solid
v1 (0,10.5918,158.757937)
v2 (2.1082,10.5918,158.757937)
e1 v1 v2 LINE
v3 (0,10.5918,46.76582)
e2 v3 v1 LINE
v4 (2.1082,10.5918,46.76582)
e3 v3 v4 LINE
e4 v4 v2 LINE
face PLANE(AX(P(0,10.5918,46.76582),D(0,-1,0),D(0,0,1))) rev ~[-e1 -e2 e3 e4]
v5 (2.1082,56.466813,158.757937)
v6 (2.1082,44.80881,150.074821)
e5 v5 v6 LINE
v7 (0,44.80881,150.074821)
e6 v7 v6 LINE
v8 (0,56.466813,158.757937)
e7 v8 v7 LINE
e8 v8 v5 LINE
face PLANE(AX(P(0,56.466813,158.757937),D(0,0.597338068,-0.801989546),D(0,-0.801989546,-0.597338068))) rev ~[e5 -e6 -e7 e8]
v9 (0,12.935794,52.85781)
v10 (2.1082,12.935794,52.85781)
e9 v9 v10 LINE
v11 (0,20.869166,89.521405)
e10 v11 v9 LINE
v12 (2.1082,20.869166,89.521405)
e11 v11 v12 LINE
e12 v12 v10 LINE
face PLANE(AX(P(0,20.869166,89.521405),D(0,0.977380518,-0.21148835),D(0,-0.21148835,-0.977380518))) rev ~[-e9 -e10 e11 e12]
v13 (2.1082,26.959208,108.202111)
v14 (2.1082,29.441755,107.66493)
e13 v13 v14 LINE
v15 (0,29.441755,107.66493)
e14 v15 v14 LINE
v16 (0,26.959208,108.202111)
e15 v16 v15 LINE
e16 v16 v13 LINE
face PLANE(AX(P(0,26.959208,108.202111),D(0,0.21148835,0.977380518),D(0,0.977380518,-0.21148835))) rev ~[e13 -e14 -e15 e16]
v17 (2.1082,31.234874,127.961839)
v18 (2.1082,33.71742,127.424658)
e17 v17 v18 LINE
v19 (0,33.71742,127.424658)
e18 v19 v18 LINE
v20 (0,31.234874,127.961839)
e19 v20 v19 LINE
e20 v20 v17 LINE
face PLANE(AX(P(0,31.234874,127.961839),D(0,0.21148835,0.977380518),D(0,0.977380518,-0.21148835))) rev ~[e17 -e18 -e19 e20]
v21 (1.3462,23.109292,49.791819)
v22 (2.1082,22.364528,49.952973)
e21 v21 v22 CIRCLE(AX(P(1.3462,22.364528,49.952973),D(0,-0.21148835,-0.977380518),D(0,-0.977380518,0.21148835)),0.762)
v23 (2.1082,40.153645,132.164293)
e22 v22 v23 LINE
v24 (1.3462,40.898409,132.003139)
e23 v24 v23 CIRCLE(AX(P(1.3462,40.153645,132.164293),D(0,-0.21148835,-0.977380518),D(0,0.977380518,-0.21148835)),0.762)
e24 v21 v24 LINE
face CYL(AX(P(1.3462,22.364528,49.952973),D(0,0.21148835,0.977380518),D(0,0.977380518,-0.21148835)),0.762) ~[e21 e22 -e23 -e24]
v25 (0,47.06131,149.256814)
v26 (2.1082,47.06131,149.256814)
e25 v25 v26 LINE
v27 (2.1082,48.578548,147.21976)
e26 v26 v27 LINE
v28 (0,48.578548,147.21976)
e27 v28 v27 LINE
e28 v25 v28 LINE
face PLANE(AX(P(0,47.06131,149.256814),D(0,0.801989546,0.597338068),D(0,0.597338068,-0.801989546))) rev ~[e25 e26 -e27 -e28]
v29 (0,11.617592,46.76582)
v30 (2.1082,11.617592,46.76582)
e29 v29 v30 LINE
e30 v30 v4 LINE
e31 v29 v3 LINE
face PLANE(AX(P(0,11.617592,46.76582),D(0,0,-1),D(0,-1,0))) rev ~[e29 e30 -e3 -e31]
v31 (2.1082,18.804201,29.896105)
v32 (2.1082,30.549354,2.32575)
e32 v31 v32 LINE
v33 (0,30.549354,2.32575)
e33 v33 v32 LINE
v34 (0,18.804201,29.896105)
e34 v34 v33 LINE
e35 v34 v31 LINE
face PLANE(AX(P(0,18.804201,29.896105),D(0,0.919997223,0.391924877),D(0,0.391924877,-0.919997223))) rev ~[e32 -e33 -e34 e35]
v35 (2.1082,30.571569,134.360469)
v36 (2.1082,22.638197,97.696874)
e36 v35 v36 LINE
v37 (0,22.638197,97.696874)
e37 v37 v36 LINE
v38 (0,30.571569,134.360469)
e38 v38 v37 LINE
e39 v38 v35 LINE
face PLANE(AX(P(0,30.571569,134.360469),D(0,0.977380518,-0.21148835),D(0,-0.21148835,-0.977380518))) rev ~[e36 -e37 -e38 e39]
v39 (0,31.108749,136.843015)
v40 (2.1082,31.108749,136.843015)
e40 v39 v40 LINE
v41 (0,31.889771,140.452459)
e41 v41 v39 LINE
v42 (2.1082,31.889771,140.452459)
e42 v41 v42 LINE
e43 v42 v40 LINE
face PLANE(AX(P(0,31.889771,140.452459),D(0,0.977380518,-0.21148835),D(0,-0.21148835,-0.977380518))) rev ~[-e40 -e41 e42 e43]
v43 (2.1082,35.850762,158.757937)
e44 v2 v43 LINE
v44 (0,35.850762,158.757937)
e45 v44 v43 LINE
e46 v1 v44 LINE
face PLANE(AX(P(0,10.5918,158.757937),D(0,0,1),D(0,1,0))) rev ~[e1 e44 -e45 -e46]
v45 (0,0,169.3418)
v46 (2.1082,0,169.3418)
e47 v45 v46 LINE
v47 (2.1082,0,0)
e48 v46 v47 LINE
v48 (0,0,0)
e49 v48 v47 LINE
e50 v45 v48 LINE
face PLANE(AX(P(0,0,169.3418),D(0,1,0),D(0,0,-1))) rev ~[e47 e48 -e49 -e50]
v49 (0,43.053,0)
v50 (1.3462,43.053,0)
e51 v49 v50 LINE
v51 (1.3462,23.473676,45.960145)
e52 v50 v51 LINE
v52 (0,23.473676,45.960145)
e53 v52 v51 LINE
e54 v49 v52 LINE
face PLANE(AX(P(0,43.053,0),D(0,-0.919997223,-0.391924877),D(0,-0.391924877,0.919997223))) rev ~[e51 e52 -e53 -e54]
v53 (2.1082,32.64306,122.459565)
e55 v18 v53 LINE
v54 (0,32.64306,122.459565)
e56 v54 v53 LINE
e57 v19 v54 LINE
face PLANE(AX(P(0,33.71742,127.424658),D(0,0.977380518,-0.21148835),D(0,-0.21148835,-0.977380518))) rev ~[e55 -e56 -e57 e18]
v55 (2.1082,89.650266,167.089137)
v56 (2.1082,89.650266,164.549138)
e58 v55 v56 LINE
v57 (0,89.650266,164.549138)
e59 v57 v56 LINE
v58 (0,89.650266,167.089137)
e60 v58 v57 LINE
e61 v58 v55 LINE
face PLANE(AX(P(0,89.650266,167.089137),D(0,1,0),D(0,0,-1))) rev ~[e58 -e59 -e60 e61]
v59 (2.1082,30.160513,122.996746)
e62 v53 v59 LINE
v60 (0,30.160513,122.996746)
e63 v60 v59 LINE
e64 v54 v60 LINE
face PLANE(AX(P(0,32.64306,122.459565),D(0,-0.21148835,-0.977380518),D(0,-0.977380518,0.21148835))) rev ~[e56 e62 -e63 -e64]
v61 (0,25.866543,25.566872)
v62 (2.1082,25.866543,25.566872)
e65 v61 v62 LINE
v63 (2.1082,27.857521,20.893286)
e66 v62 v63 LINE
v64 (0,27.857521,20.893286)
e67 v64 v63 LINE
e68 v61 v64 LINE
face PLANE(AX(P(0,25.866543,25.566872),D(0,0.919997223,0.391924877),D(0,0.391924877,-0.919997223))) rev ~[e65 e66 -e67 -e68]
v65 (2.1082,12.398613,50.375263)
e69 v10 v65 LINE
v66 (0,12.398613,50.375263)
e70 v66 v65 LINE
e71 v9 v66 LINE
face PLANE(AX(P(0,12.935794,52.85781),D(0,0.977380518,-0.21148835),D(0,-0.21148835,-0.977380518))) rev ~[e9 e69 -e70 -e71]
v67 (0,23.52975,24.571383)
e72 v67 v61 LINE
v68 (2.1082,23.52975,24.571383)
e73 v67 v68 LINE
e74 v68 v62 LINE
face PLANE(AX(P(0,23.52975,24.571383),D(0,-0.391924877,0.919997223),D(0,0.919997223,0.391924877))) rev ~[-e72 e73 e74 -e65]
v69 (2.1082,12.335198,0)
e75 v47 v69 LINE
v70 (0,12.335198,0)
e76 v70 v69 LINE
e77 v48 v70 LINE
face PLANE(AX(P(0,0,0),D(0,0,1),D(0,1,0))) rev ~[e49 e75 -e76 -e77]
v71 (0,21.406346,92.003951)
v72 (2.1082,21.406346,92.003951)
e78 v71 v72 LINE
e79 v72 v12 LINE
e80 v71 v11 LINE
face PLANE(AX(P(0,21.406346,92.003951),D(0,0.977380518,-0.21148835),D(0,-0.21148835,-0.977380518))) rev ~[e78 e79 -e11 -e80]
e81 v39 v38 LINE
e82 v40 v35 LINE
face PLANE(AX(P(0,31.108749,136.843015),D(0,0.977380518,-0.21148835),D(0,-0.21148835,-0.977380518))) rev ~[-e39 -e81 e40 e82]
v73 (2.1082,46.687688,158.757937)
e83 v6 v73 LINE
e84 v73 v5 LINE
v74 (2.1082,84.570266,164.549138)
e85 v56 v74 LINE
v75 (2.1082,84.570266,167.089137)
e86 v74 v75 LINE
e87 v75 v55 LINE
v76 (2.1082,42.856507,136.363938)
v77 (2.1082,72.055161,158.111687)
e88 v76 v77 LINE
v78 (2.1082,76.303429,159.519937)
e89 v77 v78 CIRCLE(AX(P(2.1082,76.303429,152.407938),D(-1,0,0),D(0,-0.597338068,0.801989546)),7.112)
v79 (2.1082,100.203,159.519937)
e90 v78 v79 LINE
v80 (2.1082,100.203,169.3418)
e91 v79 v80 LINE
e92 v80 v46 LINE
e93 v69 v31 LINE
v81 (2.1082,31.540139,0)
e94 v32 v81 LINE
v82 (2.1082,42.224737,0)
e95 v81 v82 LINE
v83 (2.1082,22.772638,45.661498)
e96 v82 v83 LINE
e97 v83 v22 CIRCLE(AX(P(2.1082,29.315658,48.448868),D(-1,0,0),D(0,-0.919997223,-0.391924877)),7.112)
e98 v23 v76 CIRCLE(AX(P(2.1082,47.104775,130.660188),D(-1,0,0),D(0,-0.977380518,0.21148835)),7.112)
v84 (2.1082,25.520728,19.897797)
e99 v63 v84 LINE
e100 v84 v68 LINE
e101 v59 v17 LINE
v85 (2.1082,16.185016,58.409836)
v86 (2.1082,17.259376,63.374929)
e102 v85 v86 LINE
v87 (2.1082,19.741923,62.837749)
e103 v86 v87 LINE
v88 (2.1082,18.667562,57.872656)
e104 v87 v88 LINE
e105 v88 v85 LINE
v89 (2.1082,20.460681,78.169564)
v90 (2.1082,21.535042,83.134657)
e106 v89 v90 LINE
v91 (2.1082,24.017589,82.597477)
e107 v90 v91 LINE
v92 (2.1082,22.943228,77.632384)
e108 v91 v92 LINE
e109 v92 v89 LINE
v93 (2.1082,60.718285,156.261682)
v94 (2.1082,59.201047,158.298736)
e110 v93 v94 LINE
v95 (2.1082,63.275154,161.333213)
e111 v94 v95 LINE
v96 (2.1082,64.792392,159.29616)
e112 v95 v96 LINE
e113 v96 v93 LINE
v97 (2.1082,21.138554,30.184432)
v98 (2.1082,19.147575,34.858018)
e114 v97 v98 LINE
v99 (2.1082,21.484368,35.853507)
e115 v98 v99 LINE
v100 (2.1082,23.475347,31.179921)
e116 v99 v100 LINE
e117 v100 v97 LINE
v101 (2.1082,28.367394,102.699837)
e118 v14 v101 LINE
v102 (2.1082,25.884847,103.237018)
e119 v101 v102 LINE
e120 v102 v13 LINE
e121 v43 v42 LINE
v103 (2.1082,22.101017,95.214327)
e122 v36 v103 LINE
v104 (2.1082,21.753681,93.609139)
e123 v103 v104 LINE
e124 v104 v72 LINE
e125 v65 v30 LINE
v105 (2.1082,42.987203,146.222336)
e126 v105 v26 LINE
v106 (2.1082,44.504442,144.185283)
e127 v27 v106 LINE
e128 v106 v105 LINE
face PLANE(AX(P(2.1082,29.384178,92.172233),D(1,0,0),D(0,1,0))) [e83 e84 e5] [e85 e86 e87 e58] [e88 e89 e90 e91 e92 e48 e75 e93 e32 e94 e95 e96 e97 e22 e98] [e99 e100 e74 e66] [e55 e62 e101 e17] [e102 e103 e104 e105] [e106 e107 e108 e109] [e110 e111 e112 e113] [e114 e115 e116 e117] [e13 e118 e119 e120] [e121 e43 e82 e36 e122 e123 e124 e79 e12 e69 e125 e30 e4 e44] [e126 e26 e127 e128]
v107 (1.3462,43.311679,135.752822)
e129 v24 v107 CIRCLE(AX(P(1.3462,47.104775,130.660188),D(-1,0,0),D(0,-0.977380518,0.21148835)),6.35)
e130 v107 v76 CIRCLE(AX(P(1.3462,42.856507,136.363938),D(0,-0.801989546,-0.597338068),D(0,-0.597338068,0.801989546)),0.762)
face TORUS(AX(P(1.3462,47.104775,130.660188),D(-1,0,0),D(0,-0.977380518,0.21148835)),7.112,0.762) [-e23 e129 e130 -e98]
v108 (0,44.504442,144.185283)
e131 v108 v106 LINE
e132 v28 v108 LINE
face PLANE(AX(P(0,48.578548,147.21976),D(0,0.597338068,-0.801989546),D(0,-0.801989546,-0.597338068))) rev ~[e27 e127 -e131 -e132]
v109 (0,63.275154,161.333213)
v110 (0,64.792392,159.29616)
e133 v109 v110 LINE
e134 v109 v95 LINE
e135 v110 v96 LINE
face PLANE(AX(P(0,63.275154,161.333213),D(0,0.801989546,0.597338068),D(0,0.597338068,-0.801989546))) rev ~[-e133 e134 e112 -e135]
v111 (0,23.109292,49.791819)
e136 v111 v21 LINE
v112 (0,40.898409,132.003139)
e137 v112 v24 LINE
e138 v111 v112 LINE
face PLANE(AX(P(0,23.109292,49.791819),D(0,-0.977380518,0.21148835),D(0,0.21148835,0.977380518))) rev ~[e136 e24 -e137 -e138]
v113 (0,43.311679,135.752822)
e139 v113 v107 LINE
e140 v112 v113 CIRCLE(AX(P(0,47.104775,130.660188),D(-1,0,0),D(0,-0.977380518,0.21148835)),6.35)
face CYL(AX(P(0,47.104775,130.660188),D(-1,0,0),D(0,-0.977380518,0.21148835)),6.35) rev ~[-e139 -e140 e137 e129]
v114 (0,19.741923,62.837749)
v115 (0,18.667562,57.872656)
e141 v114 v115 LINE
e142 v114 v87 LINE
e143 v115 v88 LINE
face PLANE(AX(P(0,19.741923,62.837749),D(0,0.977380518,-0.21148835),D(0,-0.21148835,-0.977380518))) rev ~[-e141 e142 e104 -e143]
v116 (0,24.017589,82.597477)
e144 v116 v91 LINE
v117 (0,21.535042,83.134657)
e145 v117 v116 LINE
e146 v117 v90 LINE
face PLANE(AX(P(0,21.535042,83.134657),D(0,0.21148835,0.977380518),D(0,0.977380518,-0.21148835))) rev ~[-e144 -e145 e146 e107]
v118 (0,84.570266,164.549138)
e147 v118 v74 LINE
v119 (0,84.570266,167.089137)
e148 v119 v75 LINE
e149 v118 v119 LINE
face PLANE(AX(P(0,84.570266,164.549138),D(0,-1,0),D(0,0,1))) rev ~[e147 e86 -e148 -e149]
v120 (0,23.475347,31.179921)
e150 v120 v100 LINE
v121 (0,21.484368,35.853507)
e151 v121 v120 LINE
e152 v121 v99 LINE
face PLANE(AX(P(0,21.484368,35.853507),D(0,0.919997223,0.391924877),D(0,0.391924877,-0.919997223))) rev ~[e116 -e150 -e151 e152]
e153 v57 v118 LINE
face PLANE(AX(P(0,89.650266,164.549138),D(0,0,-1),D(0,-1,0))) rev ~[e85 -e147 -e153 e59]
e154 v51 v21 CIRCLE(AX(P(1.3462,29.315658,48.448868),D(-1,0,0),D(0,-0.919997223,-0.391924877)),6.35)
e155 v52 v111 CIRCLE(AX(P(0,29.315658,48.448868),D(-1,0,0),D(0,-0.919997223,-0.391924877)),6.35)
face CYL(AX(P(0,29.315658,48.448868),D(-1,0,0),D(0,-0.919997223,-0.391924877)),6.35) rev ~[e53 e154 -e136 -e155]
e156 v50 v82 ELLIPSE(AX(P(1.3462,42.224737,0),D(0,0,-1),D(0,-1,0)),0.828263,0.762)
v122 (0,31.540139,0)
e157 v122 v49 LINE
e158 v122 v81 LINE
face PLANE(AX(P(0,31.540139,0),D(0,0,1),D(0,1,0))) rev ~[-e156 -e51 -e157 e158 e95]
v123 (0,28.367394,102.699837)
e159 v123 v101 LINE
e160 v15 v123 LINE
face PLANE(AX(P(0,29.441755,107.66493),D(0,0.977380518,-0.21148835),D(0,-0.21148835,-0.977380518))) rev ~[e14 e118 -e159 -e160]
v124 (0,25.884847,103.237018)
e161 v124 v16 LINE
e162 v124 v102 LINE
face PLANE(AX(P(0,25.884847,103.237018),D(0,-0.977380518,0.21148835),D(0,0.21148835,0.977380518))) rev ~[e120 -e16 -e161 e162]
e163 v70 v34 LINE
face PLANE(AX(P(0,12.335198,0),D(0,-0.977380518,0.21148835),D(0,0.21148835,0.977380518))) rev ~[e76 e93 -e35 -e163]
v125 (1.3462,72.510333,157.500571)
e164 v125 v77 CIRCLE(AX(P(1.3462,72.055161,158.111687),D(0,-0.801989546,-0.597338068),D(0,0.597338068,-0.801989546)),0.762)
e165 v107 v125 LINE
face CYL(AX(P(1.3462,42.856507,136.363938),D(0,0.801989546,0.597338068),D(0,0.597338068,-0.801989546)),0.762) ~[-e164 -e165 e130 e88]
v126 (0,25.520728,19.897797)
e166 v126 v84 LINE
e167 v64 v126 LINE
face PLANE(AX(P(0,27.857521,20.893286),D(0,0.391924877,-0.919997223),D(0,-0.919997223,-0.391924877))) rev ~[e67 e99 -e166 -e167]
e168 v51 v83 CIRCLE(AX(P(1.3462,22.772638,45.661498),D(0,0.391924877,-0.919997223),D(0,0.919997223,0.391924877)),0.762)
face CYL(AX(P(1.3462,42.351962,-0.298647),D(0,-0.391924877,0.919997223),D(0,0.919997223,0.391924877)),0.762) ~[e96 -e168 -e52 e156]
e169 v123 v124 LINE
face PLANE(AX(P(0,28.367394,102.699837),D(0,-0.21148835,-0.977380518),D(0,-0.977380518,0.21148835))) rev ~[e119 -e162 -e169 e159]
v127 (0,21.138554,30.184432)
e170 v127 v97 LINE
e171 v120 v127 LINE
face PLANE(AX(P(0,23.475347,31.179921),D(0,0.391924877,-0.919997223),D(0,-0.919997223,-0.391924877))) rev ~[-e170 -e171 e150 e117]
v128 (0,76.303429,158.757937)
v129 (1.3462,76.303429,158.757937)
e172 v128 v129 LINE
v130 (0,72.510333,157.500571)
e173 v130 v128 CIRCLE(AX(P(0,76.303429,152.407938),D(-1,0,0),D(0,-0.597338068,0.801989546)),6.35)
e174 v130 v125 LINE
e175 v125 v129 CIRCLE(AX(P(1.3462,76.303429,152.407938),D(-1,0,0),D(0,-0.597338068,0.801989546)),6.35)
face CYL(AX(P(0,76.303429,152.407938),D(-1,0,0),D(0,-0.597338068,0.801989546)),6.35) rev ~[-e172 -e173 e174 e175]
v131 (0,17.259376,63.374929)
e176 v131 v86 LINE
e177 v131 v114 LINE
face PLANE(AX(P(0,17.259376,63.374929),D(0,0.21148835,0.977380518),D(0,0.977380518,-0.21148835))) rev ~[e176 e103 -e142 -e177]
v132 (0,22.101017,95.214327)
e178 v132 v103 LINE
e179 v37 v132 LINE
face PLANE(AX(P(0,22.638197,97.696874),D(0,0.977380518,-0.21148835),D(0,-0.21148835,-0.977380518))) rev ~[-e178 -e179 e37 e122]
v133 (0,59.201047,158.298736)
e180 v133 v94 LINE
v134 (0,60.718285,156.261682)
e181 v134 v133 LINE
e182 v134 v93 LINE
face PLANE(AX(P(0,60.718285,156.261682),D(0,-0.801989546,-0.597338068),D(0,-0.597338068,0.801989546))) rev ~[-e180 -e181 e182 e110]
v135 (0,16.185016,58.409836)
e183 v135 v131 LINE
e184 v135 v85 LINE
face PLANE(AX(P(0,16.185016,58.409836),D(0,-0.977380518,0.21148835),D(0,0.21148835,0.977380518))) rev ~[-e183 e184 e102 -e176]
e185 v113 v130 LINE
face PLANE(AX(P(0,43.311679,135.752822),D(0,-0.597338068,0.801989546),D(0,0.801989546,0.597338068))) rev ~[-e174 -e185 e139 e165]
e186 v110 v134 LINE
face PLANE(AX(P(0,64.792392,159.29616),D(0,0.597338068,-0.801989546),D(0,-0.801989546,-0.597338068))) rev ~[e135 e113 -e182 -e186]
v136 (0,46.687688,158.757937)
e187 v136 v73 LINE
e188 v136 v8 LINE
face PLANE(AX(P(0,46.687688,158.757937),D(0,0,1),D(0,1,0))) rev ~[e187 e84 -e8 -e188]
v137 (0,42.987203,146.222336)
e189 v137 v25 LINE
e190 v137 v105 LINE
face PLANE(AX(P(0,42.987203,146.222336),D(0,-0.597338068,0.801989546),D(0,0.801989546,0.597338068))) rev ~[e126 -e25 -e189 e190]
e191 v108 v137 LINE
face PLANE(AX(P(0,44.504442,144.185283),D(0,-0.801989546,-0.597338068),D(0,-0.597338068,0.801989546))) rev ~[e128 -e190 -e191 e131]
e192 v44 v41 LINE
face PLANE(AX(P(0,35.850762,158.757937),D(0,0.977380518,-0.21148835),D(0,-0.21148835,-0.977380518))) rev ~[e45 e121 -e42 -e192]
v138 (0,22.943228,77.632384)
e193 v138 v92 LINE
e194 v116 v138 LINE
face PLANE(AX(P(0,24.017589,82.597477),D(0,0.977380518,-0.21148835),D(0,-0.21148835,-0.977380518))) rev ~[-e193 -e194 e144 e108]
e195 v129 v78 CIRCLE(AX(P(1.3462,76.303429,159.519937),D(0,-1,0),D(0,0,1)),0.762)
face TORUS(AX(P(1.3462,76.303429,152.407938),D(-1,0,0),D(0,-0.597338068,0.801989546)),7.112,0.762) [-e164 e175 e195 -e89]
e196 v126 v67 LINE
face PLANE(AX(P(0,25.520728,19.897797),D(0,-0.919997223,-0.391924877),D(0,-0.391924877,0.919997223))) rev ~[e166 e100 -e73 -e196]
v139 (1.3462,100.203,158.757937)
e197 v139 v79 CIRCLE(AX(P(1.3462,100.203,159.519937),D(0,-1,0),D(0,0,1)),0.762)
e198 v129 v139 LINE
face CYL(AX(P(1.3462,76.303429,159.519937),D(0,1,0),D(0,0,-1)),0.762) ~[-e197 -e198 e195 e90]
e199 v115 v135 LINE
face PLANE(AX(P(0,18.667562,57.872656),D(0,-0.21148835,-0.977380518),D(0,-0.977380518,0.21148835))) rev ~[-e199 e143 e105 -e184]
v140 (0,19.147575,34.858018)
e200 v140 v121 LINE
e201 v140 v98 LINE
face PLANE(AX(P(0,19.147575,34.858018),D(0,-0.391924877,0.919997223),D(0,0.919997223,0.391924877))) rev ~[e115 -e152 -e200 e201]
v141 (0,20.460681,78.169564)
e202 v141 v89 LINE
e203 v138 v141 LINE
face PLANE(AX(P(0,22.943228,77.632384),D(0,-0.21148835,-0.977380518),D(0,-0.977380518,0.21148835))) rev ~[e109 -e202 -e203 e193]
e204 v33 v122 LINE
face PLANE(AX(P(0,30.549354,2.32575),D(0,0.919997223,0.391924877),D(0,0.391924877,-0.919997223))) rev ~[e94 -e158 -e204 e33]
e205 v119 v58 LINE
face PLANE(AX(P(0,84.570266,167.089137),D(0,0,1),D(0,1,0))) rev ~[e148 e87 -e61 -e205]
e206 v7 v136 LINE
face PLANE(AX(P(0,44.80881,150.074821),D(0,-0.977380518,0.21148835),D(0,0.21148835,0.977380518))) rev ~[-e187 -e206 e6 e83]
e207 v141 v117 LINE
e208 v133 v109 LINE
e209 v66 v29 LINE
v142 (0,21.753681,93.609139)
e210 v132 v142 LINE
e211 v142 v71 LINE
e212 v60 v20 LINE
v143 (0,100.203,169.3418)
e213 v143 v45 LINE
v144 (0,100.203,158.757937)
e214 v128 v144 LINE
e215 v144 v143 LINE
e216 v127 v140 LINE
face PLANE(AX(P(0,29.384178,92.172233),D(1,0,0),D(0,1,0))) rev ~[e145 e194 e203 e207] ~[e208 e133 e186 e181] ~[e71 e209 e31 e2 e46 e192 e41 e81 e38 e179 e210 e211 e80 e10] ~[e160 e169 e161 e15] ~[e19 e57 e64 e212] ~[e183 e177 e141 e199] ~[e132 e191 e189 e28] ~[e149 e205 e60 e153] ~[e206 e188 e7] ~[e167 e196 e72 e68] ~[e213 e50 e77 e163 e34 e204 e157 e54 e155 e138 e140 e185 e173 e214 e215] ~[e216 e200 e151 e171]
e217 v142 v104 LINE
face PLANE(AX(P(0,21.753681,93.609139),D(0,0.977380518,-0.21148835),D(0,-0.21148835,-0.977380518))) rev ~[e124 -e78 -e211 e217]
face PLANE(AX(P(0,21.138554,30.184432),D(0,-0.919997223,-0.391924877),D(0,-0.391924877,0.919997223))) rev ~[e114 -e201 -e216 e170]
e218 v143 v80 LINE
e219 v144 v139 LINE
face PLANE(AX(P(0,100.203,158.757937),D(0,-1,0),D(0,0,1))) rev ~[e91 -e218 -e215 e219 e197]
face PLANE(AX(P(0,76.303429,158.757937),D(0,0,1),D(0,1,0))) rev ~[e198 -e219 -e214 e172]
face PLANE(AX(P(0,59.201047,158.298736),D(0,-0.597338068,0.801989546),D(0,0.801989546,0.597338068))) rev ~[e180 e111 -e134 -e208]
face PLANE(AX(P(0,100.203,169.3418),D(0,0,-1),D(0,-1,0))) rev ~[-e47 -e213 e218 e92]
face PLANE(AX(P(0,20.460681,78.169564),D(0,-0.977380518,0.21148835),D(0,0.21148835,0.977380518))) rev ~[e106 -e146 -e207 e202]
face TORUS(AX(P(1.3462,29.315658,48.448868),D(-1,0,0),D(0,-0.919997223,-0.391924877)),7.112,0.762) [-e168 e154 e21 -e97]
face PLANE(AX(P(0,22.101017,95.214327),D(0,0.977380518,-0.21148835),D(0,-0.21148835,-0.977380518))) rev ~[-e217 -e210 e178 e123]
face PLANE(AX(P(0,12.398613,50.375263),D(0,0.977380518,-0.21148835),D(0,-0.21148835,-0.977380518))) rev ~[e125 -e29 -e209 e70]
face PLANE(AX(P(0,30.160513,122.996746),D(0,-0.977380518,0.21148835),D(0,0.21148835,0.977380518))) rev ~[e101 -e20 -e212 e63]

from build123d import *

# Parameters (mm, degrees)
F0_W     = 5.08
F0_H     = 2.54
F1_DEPTH = 2.1082
F2_R     = 0.762


with BuildPart() as f1:
    # F0 (on Right) → F1 (new body)
    with BuildSketch(Plane.YZ):
        with BuildLine():
            Line((0, 162.0091375), (0, 0))
            Line((0, 0), (12.335197777, 0))
            Line((12.335197777, 0), (18.8042013144, 29.896105485))
            Line((18.8042013144, 29.896105485), (30.5493542935, 2.3257501254))
            Line((30.5493542935, 2.3257501254), (31.5401391658, 0))
            Line((31.5401391658, 0), (31.5707651968, 0))
            Line((31.5707651968, 0), (40.8442968098, 0))
            Line((40.8442968098, 0), (20.5594925834, 47.616175108))
            Line((20.5594925834, 47.616175108), (39.5771112022, 135.5049402038))
            Line((39.5771112022, 135.5049402038), (73.5248959406, 160.7899383022))
            Line((73.5248959406, 160.7899383022), (100.203, 160.7899383022))
            Line((100.203, 160.7899383022), (100.203, 162.0091375))
            Line((100.203, 162.0091375), (82.1398573303, 162.0091375))
            ThreePointArc((82.1398573303, 162.0091375), (80.3438061061, 162.7530862758), (79.5998573303, 164.5491375))
            Line((79.5998573303, 164.5491375), (79.5998573303, 169.3418))
            Line((79.5998573303, 169.3418), (70.6874244764, 169.3418))
            Line((70.6874244764, 169.3418), (70.6874244764, 165.8480664454))
            Line((70.6874244764, 165.8480664454), (70.6874244764, 164.5491375))
            ThreePointArc((70.6874244764, 164.5491375), (70.0510915867, 162.8675752701), (68.4609272063, 162.0285589874))
            ThreePointArc((68.4609272063, 162.0285589874), (68.3044763435, 162.0139975214), (68.1474244764, 162.0091375))
            Line((68.1474244764, 162.0091375), (0, 162.0091375))
        make_face()
        Polygon((21.4843682503, 35.8535070154), (23.4753466245, 31.1799211209), (21.1385536773, 30.1844319338), (19.147575303, 34.8580178283), align=None, mode=Mode.SUBTRACT)
        Polygon((25.8665425285, 25.5668719827), (27.8575209028, 20.8932860882), (25.5207279555, 19.8977969011), (23.5297495813, 24.5713827956), align=None, mode=Mode.SUBTRACT)
        with BuildLine():
            Line((12.3986134924, 50.3752630702), (11.6175919588, 46.7658196656))
            Line((11.6175919588, 46.7658196656), (10.5918, 46.7658196656))
            Line((10.5918, 46.7658196656), (10.5918, 158.7579375))
            Line((10.5918, 158.7579375), (35.8507619547, 158.7579375))
            Line((35.8507619547, 158.7579375), (31.8897708968, 140.4524587956))
            Line((31.8897708968, 140.4524587956), (31.1087493632, 136.8430153909))
            Line((31.1087493632, 136.8430153909), (35.5475592049, 135.882533211))
            ThreePointArc((35.5475592049, 135.882533211), (37.1456481821, 134.7755682604), (37.4929253116, 132.8628062845))
            Line((37.4929253116, 132.8628062845), (29.5595533377, 96.1992113407))
            ThreePointArc((29.5595533377, 96.1992113407), (28.452588387, 94.6011223635), (26.5398264112, 94.2538452339))
            Line((26.5398264112, 94.2538452339), (22.1010165695, 95.2143274138))
            Line((22.1010165695, 95.2143274138), (21.7536814278, 93.6091392306))
            Line((21.7536814278, 93.6091392306), (21.4063462861, 92.0039510473))
            Line((21.4063462861, 92.0039510473), (25.8451561277, 91.0434688674))
            ThreePointArc((25.8451561277, 91.0434688674), (27.4432451049, 89.9365039168), (27.7905222345, 88.0237419409))
            Line((27.7905222345, 88.0237419409), (19.8571502605, 51.3601469971))
            ThreePointArc((19.8571502605, 51.3601469971), (18.7501853099, 49.7620580199), (16.837423334, 49.4147808903))
            Line((16.837423334, 49.4147808903), (12.3986134924, 50.3752630702))
        make_face(mode=Mode.SUBTRACT)
        Polygon((47.0613097153, 149.2568137468), (48.5785484084, 147.2197602993), (44.5044415132, 144.1852829132), (42.9872028202, 146.2223363607), align=None, mode=Mode.SUBTRACT)
        Polygon((44.8088104432, 150.074821282), (46.6876875952, 158.7579375), (56.4668125154, 158.7579375), align=None, mode=Mode.SUBTRACT)
        Polygon((63.2751536106, 161.3332132886), (64.7923923036, 159.296159841), (60.7182854085, 156.2616824549), (59.2010467154, 158.2987359025), align=None, mode=Mode.SUBTRACT)
        with BuildLine():
            Line((0, 164.5491375), (0, 162.0091375))
            Line((0, 162.0091375), (68.1474244764, 162.0091375))
            ThreePointArc((68.1474244764, 162.0091375), (68.3044763435, 162.0139975214), (68.4609272063, 162.0285589874))
            Line((68.4609272063, 162.0285589874), (69.6856973646, 162.9407926238))
            Line((69.6856973646, 162.9407926238), (68.1474244764, 165.0060867035))
            Line((68.1474244764, 165.0060867035), (68.1474244764, 164.5491375))
            Line((68.1474244764, 164.5491375), (55.1748093832, 164.5491375))
            Line((55.1748093832, 164.5491375), (50.0948093832, 164.5491375))
            Line((50.0948093832, 164.5491375), (10.3999171089, 164.5491375))
            Line((10.3999171089, 164.5491375), (5.3199171089, 164.5491375))
            Line((5.3199171089, 164.5491375), (0, 164.5491375))
        make_face()
        Polygon((0, 169.3418), (0, 164.5491375), (5.3199171089, 164.5491375), (5.3199171089, 167.0891375), (10.3999171089, 167.0891375), (10.3999171089, 164.5491375), (50.0948093832, 164.5491375), (50.0948093832, 167.0891375), (55.1748093832, 167.0891375), (55.1748093832, 164.5491375), (68.1474244764, 164.5491375), (68.1474244764, 165.0060867035), (68.1474244764, 169.3418), align=None)
        with Locations((7.8599171089, 165.8191375)):
            Rectangle(F0_W, F0_H)
        with BuildLine():
            Line((69.6856973646, 162.9407926238), (68.4609272063, 162.0285589874))
            ThreePointArc((68.4609272063, 162.0285589874), (70.0510915867, 162.8675752701), (70.6874244764, 164.5491375))
            Line((70.6874244764, 164.5491375), (70.6874244764, 165.8480664454))
            Line((70.6874244764, 165.8480664454), (70.6874244764, 169.3418))
            Line((70.6874244764, 169.3418), (68.1474244764, 169.3418))
            Line((68.1474244764, 169.3418), (68.1474244764, 165.0060867035))
            Line((68.1474244764, 165.0060867035), (69.6856973646, 162.9407926238))
        make_face()
        with Locations((52.6348093832, 165.8191375)):
            Rectangle(F0_W, F0_H)
        with BuildLine():
            Line((20.5594925834, 47.616175108), (40.8442968098, 0))
            Line((40.8442968098, 0), (43.053, 0))
            Line((43.053, 0), (23.4736756901, 45.9601445708))
            ThreePointArc((23.4736756901, 45.9601445708), (22.9941781878, 47.847708452), (23.1092917667, 49.7918185633))
            Line((23.1092917667, 49.7918185633), (40.8984089502, 132.0031391675))
            ThreePointArc((40.8984089502, 132.0031391675), (41.765080018, 134.0967787378), (43.3116785091, 135.7528217618))
            Line((43.3116785091, 135.7528217618), (72.5103326221, 157.500571119))
            ThreePointArc((72.5103326221, 157.500571119), (74.3053957564, 158.4354047741), (76.3034293547, 158.7579375))
            Line((76.3034293547, 158.7579375), (100.203, 158.7579375))
            Line((100.203, 158.7579375), (100.203, 160.7899383022))
            Line((100.203, 160.7899383022), (73.5248959406, 160.7899383022))
            Line((73.5248959406, 160.7899383022), (39.5771112022, 135.5049402038))
            Line((39.5771112022, 135.5049402038), (20.5594925834, 47.616175108))
        make_face()
        with BuildLine():
            Line((82.1398573303, 169.3418), (79.5998573303, 169.3418))
            Line((79.5998573303, 169.3418), (79.5998573303, 164.5491375))
            ThreePointArc((79.5998573303, 164.5491375), (80.3438061061, 162.7530862758), (82.1398573303, 162.0091375))
            Line((82.1398573303, 162.0091375), (100.203, 162.0091375))
            Line((100.203, 162.0091375), (100.203, 164.5491375))
            Line((100.203, 164.5491375), (89.6502663064, 164.5491375))
            Line((89.6502663064, 164.5491375), (84.5702663064, 164.5491375))
            Line((84.5702663064, 164.5491375), (82.1398573303, 164.5491375))
            Line((82.1398573303, 164.5491375), (82.1398573303, 169.3418))
        make_face()
        Polygon((100.203, 169.3418), (82.1398573303, 169.3418), (82.1398573303, 164.5491375), (84.5702663064, 164.5491375), (84.5702663064, 167.0891375), (89.6502663064, 167.0891375), (89.6502663064, 164.5491375), (100.203, 164.5491375), align=None)
        with BuildLine():
            Line((12.9357939022, 52.8578095868), (12.3986134924, 50.3752630702))
            Line((12.3986134924, 50.3752630702), (16.837423334, 49.4147808903))
            ThreePointArc((16.837423334, 49.4147808903), (18.7501853099, 49.7620580199), (19.8571502605, 51.3601469971))
            Line((19.8571502605, 51.3601469971), (27.7905222345, 88.0237419409))
            ThreePointArc((27.7905222345, 88.0237419409), (27.4432451049, 89.9365039168), (25.8451561277, 91.0434688674))
            Line((25.8451561277, 91.0434688674), (21.4063462861, 92.0039510473))
            Line((21.4063462861, 92.0039510473), (20.8691658762, 89.5214045307))
            Line((20.8691658762, 89.5214045307), (25.3079757178, 88.5609223508))
            Line((25.3079757178, 88.5609223508), (24.0175885553, 82.5974767434))
            Line((24.0175885553, 82.5974767434), (22.9432277355, 77.6323837102))
            Line((22.9432277355, 77.6323837102), (19.7419229759, 62.8377489213))
            Line((19.7419229759, 62.8377489213), (18.6675621562, 57.872655888))
            Line((18.6675621562, 57.872655888), (17.3746037439, 51.8973274069))
            Line((17.3746037439, 51.8973274069), (12.9357939022, 52.8578095868))
        make_face()
        Polygon((20.8691658762, 89.5214045307), (12.9357939022, 52.8578095868), (17.3746037439, 51.8973274069), (18.6675621562, 57.872655888), (16.1850156395, 58.4098362979), (17.2593764593, 63.3749293312), (19.7419229759, 62.8377489213), (22.9432277355, 77.6323837102), (20.4606812189, 78.16956412), (21.5350420386, 83.1346571533), (24.0175885553, 82.5974767434), (25.3079757178, 88.5609223508), align=None)
        with BuildLine():
            Line((35.5475592049, 135.882533211), (31.1087493632, 136.8430153909))
            Line((31.1087493632, 136.8430153909), (30.5715689534, 134.3604688743))
            Line((30.5715689534, 134.3604688743), (35.010378795, 133.3999866944))
            Line((35.010378795, 133.3999866944), (33.7174203827, 127.4246582133))
            Line((33.7174203827, 127.4246582133), (32.643059563, 122.45956518))
            Line((32.643059563, 122.45956518), (29.4417548033, 107.6649303911))
            Line((29.4417548033, 107.6649303911), (28.3673939836, 102.6998373579))
            Line((28.3673939836, 102.6998373579), (27.077006821, 96.7363917505))
            Line((27.077006821, 96.7363917505), (22.6381969794, 97.6968739305))
            Line((22.6381969794, 97.6968739305), (22.1010165695, 95.2143274138))
            Line((22.1010165695, 95.2143274138), (26.5398264112, 94.2538452339))
            ThreePointArc((26.5398264112, 94.2538452339), (28.452588387, 94.6011223635), (29.5595533377, 96.1992113407))
            Line((29.5595533377, 96.1992113407), (37.4929253116, 132.8628062845))
            ThreePointArc((37.4929253116, 132.8628062845), (37.1456481821, 134.7755682604), (35.5475592049, 135.882533211))
        make_face()
        Polygon((35.010378795, 133.3999866944), (30.5715689534, 134.3604688743), (22.6381969794, 97.6968739305), (27.077006821, 96.7363917505), (28.3673939836, 102.6998373579), (25.884847467, 103.2370177677), (26.9592082867, 108.202110801), (29.4417548033, 107.6649303911), (32.643059563, 122.45956518), (30.1605130463, 122.9967455899), (31.2348738661, 127.9618386231), (33.7174203827, 127.4246582133), align=None)
    extrude(amount=F1_DEPTH)

    # F2
    f2_edges = [f1.edges().sort_by_distance(p)[0] for p in [
        (2.1082, 32.00385, 90.897479),
        (2.1082, 33.263338, 22.980072),
        (2.1082, 22.994178, 47.847708),
        (2.1082, 41.76508, 134.096779),
        (2.1082, 57.911006, 146.626696),
        (2.1082, 74.305396, 158.435405),
        (2.1082, 88.253215, 158.757937),
    ]]
    fillet(f2_edges, radius=F2_R)


solid = f1.part
